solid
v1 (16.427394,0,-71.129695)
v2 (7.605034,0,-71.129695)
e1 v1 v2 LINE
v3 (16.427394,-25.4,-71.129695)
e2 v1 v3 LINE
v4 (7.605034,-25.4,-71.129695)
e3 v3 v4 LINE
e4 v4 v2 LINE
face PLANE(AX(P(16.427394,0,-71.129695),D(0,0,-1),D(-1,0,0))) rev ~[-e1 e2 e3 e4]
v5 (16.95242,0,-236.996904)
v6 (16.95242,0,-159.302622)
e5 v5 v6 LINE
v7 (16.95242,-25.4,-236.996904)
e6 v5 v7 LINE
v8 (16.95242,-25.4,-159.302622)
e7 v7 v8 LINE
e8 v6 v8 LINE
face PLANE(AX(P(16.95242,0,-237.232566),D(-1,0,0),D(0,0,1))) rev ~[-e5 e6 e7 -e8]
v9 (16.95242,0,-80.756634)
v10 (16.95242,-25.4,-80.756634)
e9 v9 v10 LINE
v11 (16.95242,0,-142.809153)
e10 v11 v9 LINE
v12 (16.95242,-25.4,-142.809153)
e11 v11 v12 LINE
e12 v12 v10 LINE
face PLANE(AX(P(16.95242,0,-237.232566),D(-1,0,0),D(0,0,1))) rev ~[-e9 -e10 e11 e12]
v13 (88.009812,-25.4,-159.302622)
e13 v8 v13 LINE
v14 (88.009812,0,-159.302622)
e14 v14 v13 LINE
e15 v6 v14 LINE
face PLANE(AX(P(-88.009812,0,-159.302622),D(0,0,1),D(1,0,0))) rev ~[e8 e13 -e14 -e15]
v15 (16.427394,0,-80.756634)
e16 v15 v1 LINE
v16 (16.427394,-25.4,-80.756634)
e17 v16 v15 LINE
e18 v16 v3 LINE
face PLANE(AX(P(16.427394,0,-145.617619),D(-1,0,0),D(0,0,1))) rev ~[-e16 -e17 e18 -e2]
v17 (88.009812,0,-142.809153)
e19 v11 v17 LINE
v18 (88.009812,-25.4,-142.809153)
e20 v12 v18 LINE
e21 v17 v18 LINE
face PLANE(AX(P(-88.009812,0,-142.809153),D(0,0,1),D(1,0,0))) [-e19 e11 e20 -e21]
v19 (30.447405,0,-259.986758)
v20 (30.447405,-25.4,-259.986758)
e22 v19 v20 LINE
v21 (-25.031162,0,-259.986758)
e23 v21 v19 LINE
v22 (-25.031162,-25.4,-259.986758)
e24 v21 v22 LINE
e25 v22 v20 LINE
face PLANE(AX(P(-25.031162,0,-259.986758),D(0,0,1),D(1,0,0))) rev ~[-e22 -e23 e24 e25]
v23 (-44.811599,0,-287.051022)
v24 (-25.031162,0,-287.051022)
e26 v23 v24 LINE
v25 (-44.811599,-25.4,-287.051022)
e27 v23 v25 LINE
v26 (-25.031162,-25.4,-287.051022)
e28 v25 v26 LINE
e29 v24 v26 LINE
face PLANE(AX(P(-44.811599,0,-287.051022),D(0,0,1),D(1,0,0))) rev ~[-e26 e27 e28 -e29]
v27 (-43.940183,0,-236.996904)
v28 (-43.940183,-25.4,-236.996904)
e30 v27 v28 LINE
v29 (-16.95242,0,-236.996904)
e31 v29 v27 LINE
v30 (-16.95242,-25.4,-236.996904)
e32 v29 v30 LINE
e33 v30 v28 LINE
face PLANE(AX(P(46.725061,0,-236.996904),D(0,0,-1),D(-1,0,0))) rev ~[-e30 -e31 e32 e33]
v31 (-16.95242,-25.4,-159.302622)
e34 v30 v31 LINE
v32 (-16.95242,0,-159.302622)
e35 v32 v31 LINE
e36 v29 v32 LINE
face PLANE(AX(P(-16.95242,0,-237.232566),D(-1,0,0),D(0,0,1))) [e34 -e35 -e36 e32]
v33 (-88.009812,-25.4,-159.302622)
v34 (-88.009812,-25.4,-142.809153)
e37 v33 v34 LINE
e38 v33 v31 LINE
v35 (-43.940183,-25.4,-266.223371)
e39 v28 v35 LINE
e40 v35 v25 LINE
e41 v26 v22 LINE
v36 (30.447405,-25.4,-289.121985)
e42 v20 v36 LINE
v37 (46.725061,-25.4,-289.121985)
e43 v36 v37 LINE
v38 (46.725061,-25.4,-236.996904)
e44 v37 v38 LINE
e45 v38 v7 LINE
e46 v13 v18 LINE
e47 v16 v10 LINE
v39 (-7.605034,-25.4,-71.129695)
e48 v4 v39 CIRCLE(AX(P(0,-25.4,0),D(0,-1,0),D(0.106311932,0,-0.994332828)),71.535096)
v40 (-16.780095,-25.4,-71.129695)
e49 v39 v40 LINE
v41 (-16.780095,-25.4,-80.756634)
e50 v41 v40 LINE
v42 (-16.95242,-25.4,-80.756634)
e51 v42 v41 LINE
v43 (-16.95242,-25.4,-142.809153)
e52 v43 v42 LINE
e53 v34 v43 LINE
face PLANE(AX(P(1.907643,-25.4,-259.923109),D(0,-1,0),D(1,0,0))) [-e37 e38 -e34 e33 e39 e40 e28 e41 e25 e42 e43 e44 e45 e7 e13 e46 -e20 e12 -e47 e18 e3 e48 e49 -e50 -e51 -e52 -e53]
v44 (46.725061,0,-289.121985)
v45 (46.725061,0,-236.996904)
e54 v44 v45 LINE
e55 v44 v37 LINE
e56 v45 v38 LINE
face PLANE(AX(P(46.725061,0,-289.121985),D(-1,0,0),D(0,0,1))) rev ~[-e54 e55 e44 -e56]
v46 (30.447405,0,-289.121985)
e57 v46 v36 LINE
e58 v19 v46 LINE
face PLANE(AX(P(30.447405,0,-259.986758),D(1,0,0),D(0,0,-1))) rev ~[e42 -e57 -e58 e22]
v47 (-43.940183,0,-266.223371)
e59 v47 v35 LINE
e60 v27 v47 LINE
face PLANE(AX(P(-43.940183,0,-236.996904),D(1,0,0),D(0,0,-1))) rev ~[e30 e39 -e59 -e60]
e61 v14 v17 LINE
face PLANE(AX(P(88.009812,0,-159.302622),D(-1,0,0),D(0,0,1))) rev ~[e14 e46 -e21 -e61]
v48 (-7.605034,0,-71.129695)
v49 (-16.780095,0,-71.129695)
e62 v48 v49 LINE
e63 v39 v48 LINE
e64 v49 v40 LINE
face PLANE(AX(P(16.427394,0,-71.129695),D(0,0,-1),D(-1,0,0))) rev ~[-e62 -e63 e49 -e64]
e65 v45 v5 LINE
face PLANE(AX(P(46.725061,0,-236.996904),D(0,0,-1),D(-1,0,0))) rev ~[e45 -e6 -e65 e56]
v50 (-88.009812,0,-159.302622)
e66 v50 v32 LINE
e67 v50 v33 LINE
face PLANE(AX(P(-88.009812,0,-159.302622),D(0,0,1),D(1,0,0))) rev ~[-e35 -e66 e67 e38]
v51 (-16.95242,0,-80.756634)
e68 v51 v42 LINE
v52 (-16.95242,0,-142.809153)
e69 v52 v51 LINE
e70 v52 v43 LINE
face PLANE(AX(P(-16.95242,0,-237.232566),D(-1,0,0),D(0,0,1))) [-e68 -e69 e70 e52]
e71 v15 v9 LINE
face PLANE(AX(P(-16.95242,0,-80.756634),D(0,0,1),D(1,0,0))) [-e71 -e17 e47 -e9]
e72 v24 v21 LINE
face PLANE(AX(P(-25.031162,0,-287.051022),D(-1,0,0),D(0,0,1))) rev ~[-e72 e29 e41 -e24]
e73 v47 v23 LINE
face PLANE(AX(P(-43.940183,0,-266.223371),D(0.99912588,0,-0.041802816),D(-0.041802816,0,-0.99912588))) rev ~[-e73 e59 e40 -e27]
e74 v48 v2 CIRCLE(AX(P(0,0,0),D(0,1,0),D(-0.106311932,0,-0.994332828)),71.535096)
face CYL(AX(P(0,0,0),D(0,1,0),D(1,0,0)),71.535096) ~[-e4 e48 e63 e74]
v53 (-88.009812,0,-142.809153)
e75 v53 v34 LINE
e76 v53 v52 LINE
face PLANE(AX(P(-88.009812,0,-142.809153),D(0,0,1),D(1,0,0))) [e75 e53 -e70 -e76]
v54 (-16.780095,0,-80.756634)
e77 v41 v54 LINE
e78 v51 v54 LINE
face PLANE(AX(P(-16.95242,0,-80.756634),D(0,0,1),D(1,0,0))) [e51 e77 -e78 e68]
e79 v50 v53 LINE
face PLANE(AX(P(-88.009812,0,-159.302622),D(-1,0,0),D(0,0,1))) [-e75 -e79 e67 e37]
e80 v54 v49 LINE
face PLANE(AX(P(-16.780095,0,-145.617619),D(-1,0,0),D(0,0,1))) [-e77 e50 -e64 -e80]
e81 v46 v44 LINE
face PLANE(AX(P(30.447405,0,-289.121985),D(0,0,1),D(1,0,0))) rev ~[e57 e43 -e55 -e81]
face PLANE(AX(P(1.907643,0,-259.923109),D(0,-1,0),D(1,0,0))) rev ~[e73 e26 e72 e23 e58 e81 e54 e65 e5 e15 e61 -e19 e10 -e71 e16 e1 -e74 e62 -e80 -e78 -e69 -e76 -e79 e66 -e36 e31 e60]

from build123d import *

# Parameters (mm, degrees)
F0_R      = 71.5350962672
F1_DEPTH  = 25.4
F4_W      = 16.7800951749
F4_H      = 74.4879245758
F4_W_2    = 16.4273940027
F5_DEPTH  = 25.4
F6_W      = 176.0196238756
F6_H      = 16.4934694767
F7_DEPTH  = 25.4
F8_W      = 33.9048393071
F8_H      = 156.475931406
F9_DEPTH  = 25.4
F11_DEPTH = 25.4


# Not quite as in the source:
# - the program builds the solid bodies; features that only make, move or delete a surface that nothing else refers to are left out


with BuildPart() as f1:
    # F0 (on Front) → F1 (new body)
    with BuildSketch(Plane.XZ):
        Circle(F0_R)
    extrude(amount=F1_DEPTH)

    # F4 (on Front) → F5 (join)
    with BuildSketch(Plane.XZ):
        with Locations((-8.3900475875, -108.3736568689)):
            Rectangle(F4_W, F4_H)
        with Locations((8.2136970013, -108.3736568689)):
            Rectangle(F4_W_2, F4_H)
    extrude(amount=F5_DEPTH)

    # F6 (on Front) → F7 (join)
    with BuildSketch(Plane.XZ):
        with Locations((0, -151.0558873415)):
            Rectangle(F6_W, F6_H)
    extrude(amount=F7_DEPTH)

    # F8 (on Front) → F9 (join)
    with BuildSketch(Plane.XZ):
        with Locations((0, -158.9946001768)):
            Rectangle(F8_W, F8_H)
    extrude(amount=F9_DEPTH)

    # F10 (on Front) → F11 (join)
    with BuildSketch(Plane.XZ):
        Polygon((46.7250607908, -236.9969040155), (0, -236.9969040155), (-43.9401827753, -236.9969040155), (-43.9401827753, -266.2233710289), (-44.8115989566, -287.0510220528), (-25.0311624259, -287.0510220528), (-25.0311624259, -259.9867582321), (30.4474048316, -259.9867582321), (30.4474048316, -289.1219854355), (46.7250607908, -289.1219854355), align=None)
    extrude(amount=F11_DEPTH)


solid = f1.part
